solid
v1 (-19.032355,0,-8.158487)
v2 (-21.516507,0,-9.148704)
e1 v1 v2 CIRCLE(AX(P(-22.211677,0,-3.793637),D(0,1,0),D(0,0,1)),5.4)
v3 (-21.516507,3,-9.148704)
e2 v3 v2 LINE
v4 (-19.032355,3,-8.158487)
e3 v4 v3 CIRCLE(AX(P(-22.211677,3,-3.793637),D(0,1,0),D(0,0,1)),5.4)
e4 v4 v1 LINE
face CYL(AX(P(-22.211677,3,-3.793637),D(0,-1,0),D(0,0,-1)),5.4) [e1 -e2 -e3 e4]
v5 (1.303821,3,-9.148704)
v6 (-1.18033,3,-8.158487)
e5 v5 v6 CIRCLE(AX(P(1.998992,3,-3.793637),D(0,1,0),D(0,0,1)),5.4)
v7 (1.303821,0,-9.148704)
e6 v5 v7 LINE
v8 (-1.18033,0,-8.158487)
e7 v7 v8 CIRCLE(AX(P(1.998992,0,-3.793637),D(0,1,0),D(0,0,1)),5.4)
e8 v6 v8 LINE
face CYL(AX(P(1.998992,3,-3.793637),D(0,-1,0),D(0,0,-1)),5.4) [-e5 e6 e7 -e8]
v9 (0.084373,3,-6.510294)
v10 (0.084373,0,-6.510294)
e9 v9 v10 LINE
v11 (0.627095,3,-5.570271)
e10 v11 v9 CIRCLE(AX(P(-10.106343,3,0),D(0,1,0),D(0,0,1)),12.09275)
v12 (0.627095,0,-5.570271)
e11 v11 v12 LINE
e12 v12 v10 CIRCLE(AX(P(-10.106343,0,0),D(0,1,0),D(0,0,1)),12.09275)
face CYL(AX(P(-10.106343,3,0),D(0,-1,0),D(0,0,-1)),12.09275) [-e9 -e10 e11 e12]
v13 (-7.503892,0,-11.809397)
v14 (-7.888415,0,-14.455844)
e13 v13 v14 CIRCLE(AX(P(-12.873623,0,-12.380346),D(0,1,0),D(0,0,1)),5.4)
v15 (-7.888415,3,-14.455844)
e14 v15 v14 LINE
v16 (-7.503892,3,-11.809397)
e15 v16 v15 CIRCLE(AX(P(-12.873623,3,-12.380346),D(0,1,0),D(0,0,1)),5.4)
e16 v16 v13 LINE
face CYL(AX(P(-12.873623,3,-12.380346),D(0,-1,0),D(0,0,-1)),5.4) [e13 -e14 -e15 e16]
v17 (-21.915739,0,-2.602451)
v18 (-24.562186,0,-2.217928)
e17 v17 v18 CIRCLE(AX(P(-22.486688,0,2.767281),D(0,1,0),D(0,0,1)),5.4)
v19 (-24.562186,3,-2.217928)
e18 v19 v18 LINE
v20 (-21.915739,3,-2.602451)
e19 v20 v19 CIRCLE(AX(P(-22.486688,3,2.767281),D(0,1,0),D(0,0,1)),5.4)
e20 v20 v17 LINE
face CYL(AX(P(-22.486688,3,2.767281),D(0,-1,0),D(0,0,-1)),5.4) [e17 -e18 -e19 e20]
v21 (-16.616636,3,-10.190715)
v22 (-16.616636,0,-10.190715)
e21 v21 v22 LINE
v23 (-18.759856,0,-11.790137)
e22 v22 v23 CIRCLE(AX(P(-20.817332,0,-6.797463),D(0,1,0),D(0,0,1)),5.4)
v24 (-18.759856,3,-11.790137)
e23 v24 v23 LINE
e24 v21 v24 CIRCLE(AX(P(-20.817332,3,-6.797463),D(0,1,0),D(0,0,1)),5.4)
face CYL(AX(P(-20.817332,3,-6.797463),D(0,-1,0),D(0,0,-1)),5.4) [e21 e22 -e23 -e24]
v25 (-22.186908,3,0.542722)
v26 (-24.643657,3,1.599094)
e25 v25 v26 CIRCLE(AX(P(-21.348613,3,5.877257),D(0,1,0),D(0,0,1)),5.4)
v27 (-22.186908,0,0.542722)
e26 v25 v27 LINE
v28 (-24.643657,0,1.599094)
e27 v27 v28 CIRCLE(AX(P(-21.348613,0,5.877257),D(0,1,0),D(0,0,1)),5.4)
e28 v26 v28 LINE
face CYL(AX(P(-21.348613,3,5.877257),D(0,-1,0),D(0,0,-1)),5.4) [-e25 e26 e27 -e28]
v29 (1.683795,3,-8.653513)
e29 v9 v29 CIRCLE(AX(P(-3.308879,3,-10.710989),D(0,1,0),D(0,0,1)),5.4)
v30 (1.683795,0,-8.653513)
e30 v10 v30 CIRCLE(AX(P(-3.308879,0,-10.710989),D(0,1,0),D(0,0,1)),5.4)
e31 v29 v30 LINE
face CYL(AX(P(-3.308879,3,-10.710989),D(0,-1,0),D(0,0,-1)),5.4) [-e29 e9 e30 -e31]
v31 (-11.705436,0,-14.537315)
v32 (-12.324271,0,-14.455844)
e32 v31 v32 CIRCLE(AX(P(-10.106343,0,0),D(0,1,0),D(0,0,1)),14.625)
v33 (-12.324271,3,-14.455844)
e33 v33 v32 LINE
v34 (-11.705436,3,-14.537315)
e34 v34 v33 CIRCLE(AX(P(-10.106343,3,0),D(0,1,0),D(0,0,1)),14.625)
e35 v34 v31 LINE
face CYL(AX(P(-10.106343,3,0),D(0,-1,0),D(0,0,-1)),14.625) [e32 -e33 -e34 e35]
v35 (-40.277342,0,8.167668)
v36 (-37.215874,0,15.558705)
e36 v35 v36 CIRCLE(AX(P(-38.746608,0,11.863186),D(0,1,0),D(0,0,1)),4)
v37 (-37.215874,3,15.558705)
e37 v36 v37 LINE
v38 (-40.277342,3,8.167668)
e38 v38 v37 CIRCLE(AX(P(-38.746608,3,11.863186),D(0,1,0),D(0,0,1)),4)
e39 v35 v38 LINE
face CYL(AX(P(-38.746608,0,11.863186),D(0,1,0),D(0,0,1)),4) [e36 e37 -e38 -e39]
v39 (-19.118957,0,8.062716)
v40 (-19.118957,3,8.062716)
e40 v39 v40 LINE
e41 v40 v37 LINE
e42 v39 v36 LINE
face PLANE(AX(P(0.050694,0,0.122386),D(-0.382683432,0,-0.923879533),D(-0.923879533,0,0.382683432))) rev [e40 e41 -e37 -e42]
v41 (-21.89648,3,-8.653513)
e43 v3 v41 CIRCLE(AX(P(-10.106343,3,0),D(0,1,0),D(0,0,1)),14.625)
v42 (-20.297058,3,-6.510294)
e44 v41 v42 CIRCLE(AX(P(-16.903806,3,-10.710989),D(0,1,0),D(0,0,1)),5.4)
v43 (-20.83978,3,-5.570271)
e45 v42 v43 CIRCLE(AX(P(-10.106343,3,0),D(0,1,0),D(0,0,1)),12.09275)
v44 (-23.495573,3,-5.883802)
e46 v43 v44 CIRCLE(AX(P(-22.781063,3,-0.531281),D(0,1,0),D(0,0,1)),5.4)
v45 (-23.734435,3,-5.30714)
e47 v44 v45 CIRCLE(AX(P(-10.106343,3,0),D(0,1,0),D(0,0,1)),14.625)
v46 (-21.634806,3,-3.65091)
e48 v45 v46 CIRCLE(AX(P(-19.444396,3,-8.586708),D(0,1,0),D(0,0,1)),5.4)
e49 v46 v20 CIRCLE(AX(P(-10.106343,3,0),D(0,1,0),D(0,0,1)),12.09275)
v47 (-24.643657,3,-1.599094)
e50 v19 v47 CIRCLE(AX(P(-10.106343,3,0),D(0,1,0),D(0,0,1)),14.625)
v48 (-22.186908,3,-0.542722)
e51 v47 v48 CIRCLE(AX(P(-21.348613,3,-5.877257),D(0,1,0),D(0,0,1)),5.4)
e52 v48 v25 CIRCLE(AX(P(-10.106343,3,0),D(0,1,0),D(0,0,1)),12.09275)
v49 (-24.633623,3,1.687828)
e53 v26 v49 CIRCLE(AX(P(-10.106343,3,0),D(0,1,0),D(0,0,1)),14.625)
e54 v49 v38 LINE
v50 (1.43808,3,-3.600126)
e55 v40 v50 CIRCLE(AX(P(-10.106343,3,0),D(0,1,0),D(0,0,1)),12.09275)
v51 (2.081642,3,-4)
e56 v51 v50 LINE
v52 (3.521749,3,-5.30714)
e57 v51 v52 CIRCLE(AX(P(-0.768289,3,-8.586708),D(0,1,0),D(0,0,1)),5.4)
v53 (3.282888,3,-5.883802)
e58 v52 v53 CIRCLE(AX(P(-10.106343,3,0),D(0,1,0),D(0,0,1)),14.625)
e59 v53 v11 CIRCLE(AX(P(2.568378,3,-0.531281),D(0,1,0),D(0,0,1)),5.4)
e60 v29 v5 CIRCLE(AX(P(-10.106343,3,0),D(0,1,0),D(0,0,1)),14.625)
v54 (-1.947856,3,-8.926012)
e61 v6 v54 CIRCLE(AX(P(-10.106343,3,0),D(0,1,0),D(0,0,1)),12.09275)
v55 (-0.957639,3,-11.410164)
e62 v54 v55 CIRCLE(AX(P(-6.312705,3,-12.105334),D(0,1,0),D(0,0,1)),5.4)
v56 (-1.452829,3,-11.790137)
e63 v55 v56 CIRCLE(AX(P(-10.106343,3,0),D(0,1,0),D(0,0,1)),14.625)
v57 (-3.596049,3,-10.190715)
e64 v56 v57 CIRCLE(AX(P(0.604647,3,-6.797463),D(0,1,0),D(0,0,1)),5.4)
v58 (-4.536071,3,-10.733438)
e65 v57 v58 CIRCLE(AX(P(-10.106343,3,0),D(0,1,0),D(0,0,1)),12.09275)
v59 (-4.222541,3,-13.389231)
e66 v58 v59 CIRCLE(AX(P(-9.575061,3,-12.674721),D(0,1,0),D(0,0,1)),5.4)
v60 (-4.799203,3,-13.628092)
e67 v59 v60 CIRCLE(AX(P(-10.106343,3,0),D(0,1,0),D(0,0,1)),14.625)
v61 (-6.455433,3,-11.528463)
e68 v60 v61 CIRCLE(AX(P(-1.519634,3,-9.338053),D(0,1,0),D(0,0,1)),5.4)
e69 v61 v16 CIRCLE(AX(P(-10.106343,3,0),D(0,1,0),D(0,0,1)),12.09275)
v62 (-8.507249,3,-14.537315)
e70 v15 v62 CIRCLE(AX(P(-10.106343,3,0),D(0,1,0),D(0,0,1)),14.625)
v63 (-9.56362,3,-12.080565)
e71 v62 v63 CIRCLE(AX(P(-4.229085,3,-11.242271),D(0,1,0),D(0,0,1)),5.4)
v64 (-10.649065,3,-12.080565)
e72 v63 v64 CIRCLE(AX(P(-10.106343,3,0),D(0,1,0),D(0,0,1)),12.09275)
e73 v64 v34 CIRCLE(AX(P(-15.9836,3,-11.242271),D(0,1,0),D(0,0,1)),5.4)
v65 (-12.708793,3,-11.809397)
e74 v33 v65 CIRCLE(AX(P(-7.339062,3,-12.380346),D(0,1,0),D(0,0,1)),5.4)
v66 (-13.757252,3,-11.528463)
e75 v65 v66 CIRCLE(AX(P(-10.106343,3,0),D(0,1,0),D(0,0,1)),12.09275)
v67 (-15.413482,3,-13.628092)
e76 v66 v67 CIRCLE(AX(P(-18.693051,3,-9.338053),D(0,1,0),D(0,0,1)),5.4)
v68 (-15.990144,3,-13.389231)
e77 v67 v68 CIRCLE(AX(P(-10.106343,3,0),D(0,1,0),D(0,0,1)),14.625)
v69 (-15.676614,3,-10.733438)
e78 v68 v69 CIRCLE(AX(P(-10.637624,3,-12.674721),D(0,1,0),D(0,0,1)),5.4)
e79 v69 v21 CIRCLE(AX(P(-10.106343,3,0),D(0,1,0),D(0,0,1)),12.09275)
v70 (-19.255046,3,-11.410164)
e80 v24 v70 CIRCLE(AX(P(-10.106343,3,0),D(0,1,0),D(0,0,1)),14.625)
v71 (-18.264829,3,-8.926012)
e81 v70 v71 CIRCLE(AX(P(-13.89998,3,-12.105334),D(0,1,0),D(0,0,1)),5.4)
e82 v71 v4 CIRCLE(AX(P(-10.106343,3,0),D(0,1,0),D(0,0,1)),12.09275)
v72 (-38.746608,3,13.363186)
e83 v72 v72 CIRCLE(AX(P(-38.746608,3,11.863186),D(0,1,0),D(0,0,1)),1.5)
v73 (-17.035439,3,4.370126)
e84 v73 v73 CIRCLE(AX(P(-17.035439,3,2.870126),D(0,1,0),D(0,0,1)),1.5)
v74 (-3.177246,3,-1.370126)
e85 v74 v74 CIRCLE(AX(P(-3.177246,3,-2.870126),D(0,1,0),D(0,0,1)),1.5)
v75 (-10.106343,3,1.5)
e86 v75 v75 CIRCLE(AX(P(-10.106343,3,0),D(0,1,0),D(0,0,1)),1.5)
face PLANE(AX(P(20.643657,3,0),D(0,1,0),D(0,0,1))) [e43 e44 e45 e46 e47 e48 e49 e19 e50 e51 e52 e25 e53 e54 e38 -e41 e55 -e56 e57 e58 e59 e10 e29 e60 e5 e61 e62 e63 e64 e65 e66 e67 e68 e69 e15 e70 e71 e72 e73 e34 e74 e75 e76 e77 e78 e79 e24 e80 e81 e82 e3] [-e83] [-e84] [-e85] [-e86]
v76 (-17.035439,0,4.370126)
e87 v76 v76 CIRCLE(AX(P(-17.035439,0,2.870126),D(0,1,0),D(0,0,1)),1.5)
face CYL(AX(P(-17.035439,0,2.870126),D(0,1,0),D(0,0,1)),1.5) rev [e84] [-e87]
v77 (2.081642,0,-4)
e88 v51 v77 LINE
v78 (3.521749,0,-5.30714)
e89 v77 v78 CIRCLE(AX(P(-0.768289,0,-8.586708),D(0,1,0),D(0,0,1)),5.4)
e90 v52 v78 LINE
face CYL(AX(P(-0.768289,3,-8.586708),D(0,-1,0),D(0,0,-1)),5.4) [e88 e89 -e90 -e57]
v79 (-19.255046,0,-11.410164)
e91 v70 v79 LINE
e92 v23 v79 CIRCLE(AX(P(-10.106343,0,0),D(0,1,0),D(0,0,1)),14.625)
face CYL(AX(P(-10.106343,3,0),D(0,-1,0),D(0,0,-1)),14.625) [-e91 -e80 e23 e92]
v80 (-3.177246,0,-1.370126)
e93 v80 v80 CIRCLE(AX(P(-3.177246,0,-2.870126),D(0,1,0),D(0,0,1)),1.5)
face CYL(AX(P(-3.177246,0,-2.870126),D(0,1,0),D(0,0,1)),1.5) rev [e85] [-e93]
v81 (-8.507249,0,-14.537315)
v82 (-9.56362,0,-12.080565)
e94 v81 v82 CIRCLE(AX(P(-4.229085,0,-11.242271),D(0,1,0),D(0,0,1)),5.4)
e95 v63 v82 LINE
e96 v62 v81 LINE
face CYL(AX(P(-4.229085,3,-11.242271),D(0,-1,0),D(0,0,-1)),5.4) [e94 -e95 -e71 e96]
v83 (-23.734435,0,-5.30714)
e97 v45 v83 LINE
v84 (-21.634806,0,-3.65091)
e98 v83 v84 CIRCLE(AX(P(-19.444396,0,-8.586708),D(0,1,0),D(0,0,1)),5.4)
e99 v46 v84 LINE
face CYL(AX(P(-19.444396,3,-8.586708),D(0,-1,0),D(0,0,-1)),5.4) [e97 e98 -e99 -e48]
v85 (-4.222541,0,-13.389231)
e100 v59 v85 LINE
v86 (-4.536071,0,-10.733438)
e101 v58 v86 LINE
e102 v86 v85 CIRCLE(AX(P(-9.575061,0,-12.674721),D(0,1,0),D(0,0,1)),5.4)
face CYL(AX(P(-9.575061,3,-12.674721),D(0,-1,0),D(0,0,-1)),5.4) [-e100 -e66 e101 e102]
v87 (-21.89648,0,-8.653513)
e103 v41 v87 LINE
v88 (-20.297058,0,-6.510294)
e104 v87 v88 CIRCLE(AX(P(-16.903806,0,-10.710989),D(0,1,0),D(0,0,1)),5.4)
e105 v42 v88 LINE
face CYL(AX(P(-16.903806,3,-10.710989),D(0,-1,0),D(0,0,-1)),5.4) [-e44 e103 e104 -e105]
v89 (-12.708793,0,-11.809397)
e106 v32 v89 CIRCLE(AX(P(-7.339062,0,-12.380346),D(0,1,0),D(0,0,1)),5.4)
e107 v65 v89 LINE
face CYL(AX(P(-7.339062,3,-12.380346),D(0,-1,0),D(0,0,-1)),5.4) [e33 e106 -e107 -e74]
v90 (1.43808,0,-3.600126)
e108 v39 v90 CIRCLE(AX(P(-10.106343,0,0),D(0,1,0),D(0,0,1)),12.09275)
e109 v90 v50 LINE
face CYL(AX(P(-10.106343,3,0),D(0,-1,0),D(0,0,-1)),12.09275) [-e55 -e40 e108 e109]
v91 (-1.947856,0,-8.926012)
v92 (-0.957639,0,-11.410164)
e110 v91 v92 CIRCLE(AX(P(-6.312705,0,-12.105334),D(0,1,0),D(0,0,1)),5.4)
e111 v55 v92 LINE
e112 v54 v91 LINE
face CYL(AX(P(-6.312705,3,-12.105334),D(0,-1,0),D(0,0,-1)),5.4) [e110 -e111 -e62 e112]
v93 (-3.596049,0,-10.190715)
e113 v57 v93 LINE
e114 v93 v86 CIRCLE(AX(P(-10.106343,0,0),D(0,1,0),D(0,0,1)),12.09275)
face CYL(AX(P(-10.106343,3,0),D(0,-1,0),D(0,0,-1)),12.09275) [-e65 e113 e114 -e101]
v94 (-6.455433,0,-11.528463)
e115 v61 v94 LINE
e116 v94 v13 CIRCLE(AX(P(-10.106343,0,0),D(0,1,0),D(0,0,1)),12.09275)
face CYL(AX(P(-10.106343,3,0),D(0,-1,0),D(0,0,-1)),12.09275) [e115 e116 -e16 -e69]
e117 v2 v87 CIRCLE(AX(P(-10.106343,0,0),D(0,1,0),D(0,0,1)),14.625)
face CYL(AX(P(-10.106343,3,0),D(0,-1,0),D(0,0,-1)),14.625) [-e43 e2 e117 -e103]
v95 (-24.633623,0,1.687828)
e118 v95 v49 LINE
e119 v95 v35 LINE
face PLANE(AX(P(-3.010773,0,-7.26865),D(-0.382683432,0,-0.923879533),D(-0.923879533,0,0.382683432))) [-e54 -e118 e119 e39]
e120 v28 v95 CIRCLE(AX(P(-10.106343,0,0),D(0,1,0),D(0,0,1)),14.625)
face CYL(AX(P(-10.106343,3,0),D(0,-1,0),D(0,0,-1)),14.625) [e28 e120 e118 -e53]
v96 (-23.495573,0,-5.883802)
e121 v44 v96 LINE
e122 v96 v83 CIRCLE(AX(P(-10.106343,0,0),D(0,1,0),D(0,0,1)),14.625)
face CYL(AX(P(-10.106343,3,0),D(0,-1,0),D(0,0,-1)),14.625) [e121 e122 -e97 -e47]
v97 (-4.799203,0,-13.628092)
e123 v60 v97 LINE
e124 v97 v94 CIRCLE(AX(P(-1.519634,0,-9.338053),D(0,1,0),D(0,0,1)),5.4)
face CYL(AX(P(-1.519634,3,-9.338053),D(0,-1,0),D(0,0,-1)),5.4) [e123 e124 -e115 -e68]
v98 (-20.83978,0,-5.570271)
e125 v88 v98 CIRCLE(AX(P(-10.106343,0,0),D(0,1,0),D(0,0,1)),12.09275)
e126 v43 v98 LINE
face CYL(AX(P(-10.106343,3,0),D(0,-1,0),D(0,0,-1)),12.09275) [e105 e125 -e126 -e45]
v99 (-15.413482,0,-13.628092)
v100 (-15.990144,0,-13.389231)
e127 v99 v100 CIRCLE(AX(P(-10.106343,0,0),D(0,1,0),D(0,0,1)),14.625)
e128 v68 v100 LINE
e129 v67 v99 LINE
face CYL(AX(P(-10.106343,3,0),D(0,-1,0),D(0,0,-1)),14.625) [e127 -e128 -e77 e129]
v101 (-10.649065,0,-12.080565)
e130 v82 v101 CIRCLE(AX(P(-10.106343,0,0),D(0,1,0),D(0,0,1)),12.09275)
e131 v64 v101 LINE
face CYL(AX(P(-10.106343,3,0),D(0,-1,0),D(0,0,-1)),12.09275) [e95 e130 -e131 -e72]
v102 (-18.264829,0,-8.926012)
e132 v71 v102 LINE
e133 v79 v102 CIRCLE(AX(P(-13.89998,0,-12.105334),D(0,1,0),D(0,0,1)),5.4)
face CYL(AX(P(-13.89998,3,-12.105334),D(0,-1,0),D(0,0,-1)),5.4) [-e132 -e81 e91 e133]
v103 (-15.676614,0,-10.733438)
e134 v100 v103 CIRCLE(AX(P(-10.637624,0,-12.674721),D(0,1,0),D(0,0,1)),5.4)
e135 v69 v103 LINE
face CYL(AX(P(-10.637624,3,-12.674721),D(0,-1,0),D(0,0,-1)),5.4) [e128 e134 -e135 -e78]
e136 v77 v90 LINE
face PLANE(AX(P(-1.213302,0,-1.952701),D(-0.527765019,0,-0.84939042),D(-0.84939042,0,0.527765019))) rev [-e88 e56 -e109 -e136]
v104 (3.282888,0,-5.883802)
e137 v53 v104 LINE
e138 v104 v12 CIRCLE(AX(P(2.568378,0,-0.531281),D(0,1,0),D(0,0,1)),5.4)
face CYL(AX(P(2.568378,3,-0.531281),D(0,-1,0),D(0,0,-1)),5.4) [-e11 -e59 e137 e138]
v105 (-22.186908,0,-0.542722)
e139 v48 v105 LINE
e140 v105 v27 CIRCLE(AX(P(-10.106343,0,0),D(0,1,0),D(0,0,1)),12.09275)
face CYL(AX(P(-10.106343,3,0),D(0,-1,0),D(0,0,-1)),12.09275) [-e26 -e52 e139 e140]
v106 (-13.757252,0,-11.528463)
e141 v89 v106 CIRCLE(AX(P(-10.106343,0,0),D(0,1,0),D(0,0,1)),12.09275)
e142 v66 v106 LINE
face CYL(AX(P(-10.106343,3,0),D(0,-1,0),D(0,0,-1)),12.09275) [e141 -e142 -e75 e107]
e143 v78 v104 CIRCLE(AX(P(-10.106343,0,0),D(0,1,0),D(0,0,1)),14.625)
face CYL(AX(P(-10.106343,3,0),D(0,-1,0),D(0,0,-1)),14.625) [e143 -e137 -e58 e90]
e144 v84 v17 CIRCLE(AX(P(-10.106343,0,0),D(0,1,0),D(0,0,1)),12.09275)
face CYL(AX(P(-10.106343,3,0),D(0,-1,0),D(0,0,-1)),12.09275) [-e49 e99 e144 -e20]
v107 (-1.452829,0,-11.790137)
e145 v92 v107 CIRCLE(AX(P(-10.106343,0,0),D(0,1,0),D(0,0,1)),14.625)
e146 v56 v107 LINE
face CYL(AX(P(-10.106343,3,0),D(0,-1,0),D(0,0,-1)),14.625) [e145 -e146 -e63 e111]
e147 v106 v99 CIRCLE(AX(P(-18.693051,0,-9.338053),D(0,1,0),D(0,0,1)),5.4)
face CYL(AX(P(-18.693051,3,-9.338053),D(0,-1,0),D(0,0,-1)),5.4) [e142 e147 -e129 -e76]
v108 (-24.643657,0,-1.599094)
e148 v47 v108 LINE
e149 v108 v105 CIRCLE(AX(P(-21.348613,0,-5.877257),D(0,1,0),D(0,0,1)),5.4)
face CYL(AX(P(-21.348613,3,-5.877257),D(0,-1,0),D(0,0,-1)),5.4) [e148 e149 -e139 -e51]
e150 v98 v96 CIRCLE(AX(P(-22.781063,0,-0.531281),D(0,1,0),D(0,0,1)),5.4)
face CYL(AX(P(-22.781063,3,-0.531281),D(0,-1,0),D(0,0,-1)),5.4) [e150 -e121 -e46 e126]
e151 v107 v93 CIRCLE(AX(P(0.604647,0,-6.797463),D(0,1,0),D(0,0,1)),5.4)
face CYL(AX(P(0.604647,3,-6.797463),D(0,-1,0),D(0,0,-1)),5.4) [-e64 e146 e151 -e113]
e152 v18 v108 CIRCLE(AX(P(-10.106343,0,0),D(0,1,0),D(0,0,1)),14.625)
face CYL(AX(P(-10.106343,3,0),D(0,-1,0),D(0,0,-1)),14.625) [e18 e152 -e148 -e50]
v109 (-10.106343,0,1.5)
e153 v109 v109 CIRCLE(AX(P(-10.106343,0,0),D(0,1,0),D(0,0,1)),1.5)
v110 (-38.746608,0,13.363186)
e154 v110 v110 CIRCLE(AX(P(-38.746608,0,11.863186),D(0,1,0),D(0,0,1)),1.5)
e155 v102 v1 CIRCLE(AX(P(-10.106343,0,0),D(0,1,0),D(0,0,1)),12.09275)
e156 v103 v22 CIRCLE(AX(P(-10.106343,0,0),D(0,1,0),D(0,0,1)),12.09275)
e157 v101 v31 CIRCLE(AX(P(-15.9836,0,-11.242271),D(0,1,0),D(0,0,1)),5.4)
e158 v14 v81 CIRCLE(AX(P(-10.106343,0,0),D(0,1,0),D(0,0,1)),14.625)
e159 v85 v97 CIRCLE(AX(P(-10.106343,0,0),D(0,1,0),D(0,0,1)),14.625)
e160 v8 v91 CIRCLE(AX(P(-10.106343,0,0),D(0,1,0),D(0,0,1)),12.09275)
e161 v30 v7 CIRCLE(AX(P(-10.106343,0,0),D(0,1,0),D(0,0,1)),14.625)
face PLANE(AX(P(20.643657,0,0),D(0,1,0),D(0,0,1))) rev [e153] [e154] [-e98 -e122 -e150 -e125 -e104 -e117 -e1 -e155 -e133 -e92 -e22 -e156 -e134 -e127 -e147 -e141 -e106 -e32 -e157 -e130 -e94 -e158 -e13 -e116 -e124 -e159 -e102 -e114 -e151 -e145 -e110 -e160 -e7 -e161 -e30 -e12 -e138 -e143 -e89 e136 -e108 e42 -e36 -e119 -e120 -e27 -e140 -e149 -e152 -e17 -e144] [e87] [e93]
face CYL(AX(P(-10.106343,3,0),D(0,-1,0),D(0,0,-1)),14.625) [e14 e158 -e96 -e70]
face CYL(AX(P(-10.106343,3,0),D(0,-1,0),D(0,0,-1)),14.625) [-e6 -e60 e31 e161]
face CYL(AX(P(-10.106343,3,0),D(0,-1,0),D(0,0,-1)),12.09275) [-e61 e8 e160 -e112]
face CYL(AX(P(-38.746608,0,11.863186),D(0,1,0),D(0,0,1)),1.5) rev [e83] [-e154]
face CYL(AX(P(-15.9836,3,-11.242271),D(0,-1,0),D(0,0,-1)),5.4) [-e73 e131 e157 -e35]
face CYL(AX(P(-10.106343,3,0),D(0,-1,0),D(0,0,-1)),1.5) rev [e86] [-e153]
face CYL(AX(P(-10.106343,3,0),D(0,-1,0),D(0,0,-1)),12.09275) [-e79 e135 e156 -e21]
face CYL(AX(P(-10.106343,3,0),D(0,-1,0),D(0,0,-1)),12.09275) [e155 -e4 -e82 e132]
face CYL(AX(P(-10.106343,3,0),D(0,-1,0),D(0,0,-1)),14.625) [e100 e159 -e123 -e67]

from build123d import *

# Parameters (mm, degrees)
SKETCH1_R              = 1.5
BOSS_EXTRUDE1_DEPTH    = 3
SKETCH3_R              = 1.5
BOSS_EXTRUDE2_DEPTH    = 3
CUT_EXTRUDE1_OUTLINE_R = 1.5
CUT_EXTRUDE1_DEPTH     = 3


# Read off the part's stored shape, not the designer's step: Cut-Extrude1
with BuildPart() as part:
    # Sketch1 → Boss-Extrude1 (new body)
    with BuildSketch(Plane(origin=(0, 0, 0), x_dir=(1, 0, 0), z_dir=(0, 1, 0))):
        with BuildLine():
            Line((20.643657446, 4), (2.081641936, 4))
            ThreePointArc((2.081641936, 4), (2.861028333, 4.588201733), (3.521749436, 5.30713988))
            ThreePointArc((3.521749436, 5.30713988), (3.405395609, 5.596745198), (3.282888305, 5.883801663))
            ThreePointArc((3.282888305, 5.883801663), (1.93527598, 5.894040025), (0.627094961, 5.57027124))
            ThreePointArc((0.627094961, 5.57027124), (0.366286148, 6.046375), (0.084372603, 6.510293938))
            ThreePointArc((0.084372603, 6.510293938), (1.018855105, 7.48132754), (1.683794586, 8.65351323))
            ThreePointArc((1.683794586, 8.65351323), (1.496450048, 8.903135899), (1.303821399, 9.148703928))
            ThreePointArc((1.303821399, 9.148703928), (-0.000522033, 8.809805691), (-1.180330337, 8.158486898))
            ThreePointArc((-1.180330337, 8.158486898), (-1.555477026, 8.550865528), (-1.947855656, 8.926012217))
            ThreePointArc((-1.947855656, 8.926012217), (-1.296536862, 10.105820521), (-0.957638625, 11.410163953))
            ThreePointArc((-0.957638625, 11.410163953), (-1.203206655, 11.602792602), (-1.452829324, 11.79013714))
            ThreePointArc((-1.452829324, 11.79013714), (-2.625015014, 11.125197659), (-3.596048616, 10.190715157))
            ThreePointArc((-3.596048616, 10.190715157), (-4.059967554, 10.472628702), (-4.536071314, 10.733437515))
            ThreePointArc((-4.536071314, 10.733437515), (-4.212302529, 12.041618533), (-4.222540891, 13.389230859))
            ThreePointArc((-4.222540891, 13.389230859), (-4.509597355, 13.511738163), (-4.799202674, 13.62809199))
            ThreePointArc((-4.799202674, 13.62809199), (-5.759348103, 12.682425791), (-6.455432668, 11.528463019))
            ThreePointArc((-6.455432668, 11.528463019), (-6.976508546, 11.680699536), (-7.503891752, 11.809396783))
            ThreePointArc((-7.503891752, 11.809396783), (-7.529737283, 13.156800143), (-7.888414517, 14.455843809))
            ThreePointArc((-7.888414517, 14.455843809), (-8.197396993, 14.499881098), (-8.507248835, 14.537314892))
            ThreePointArc((-8.507248835, 14.537314892), (-9.18992168, 13.375367565), (-9.563620196, 12.080565177))
            ThreePointArc((-9.563620196, 12.080565177), (-10.106342554, 12.09275), (-10.649064912, 12.080565177))
            ThreePointArc((-10.649064912, 12.080565177), (-11.022763428, 13.375367565), (-11.705436272, 14.537314892))
            ThreePointArc((-11.705436272, 14.537314892), (-12.015288115, 14.499881098), (-12.324270591, 14.455843809))
            ThreePointArc((-12.324270591, 14.455843809), (-12.682947825, 13.156800143), (-12.708793355, 11.809396783))
            ThreePointArc((-12.708793355, 11.809396783), (-13.236176561, 11.680699536), (-13.757252439, 11.528463019))
            ThreePointArc((-13.757252439, 11.528463019), (-14.453337005, 12.682425791), (-15.413482434, 13.62809199))
            ThreePointArc((-15.413482434, 13.62809199), (-15.703087752, 13.511738163), (-15.990144217, 13.389230859))
            ThreePointArc((-15.990144217, 13.389230859), (-16.000382579, 12.041618533), (-15.676613793, 10.733437515))
            ThreePointArc((-15.676613793, 10.733437515), (-16.152717554, 10.472628702), (-16.616636492, 10.190715157))
            ThreePointArc((-16.616636492, 10.190715157), (-17.587670094, 11.125197659), (-18.759855783, 11.79013714))
            ThreePointArc((-18.759855783, 11.79013714), (-19.009478453, 11.602792602), (-19.255046482, 11.410163953))
            ThreePointArc((-19.255046482, 11.410163953), (-18.916148245, 10.105820521), (-18.264829452, 8.926012217))
            ThreePointArc((-18.264829452, 8.926012217), (-18.657208082, 8.550865528), (-19.032354771, 8.158486898))
            ThreePointArc((-19.032354771, 8.158486898), (-20.212163074, 8.809805691), (-21.516506507, 9.148703928))
            ThreePointArc((-21.516506507, 9.148703928), (-21.709135156, 8.903135899), (-21.896479694, 8.65351323))
            ThreePointArc((-21.896479694, 8.65351323), (-21.231540213, 7.48132754), (-20.297057711, 6.510293938))
            ThreePointArc((-20.297057711, 6.510293938), (-20.578971255, 6.046375), (-20.839780068, 5.57027124))
            ThreePointArc((-20.839780068, 5.57027124), (-22.147961087, 5.894040025), (-23.495573413, 5.883801663))
            ThreePointArc((-23.495573413, 5.883801663), (-23.618080717, 5.596745198), (-23.734434544, 5.30713988))
            ThreePointArc((-23.734434544, 5.30713988), (-22.788768345, 4.346994451), (-21.634805572, 3.650909885))
            ThreePointArc((-21.634805572, 3.650909885), (-21.78704209, 3.129834008), (-21.915739337, 2.602450802))
            ThreePointArc((-21.915739337, 2.602450802), (-23.263142697, 2.576605271), (-24.562186363, 2.217928037))
            ThreePointArc((-24.562186363, 2.217928037), (-24.606223651, 1.908945561), (-24.643657446, 1.599093719))
            ThreePointArc((-24.643657446, 1.599093719), (-23.481710119, 0.916420874), (-22.186907731, 0.542722358))
            ThreePointArc((-22.186907731, 0.542722358), (-22.199092554, 0), (-22.186907731, -0.542722358))
            ThreePointArc((-22.186907731, -0.542722358), (-23.481710119, -0.916420874), (-24.643657446, -1.599093719))
            ThreePointArc((-24.643657446, -1.599093719), (-24.606223651, -1.908945561), (-24.562186363, -2.217928037))
            ThreePointArc((-24.562186363, -2.217928037), (-23.263142697, -2.576605271), (-21.915739337, -2.602450802))
            ThreePointArc((-21.915739337, -2.602450802), (-21.78704209, -3.129834008), (-21.634805572, -3.650909885))
            ThreePointArc((-21.634805572, -3.650909885), (-22.788768345, -4.346994451), (-23.734434544, -5.30713988))
            ThreePointArc((-23.734434544, -5.30713988), (-23.618080717, -5.596745198), (-23.495573413, -5.883801663))
            ThreePointArc((-23.495573413, -5.883801663), (-22.147961087, -5.894040025), (-20.839780068, -5.57027124))
            ThreePointArc((-20.839780068, -5.57027124), (-20.578971255, -6.046375), (-20.297057711, -6.510293938))
            ThreePointArc((-20.297057711, -6.510293938), (-21.231540213, -7.48132754), (-21.896479694, -8.65351323))
            ThreePointArc((-21.896479694, -8.65351323), (-21.709135156, -8.903135899), (-21.516506507, -9.148703928))
            ThreePointArc((-21.516506507, -9.148703928), (-20.212163074, -8.809805691), (-19.032354771, -8.158486898))
            ThreePointArc((-19.032354771, -8.158486898), (-18.657208082, -8.550865528), (-18.264829452, -8.926012217))
            ThreePointArc((-18.264829452, -8.926012217), (-18.916148245, -10.105820521), (-19.255046482, -11.410163953))
            ThreePointArc((-19.255046482, -11.410163953), (-19.009478453, -11.602792602), (-18.759855783, -11.79013714))
            ThreePointArc((-18.759855783, -11.79013714), (-17.587670094, -11.125197659), (-16.616636492, -10.190715157))
            ThreePointArc((-16.616636492, -10.190715157), (-16.152717554, -10.472628702), (-15.676613793, -10.733437515))
            ThreePointArc((-15.676613793, -10.733437515), (-16.000382579, -12.041618533), (-15.990144217, -13.389230859))
            ThreePointArc((-15.990144217, -13.389230859), (-15.703087752, -13.511738163), (-15.413482434, -13.62809199))
            ThreePointArc((-15.413482434, -13.62809199), (-14.453337005, -12.682425791), (-13.757252439, -11.528463019))
            ThreePointArc((-13.757252439, -11.528463019), (-13.236176561, -11.680699536), (-12.708793355, -11.809396783))
            ThreePointArc((-12.708793355, -11.809396783), (-12.682947825, -13.156800143), (-12.324270591, -14.455843809))
            ThreePointArc((-12.324270591, -14.455843809), (-12.015288115, -14.499881098), (-11.705436272, -14.537314892))
            ThreePointArc((-11.705436272, -14.537314892), (-11.022763428, -13.375367565), (-10.649064912, -12.080565177))
            ThreePointArc((-10.649064912, -12.080565177), (-10.106342554, -12.09275), (-9.563620196, -12.080565177))
            ThreePointArc((-9.563620196, -12.080565177), (-9.18992168, -13.375367565), (-8.507248835, -14.537314892))
            ThreePointArc((-8.507248835, -14.537314892), (-8.197396993, -14.499881098), (-7.888414517, -14.455843809))
            ThreePointArc((-7.888414517, -14.455843809), (-7.529737283, -13.156800143), (-7.503891752, -11.809396783))
            ThreePointArc((-7.503891752, -11.809396783), (-6.976508546, -11.680699536), (-6.455432668, -11.528463019))
            ThreePointArc((-6.455432668, -11.528463019), (-5.759348103, -12.682425791), (-4.799202674, -13.62809199))
            ThreePointArc((-4.799202674, -13.62809199), (-4.509597355, -13.511738163), (-4.222540891, -13.389230859))
            ThreePointArc((-4.222540891, -13.389230859), (-4.212302529, -12.041618533), (-4.536071314, -10.733437515))
            ThreePointArc((-4.536071314, -10.733437515), (-4.059967554, -10.472628702), (-3.596048616, -10.190715157))
            ThreePointArc((-3.596048616, -10.190715157), (-2.625015014, -11.125197659), (-1.452829324, -11.79013714))
            ThreePointArc((-1.452829324, -11.79013714), (-1.203206655, -11.602792602), (-0.957638625, -11.410163953))
            ThreePointArc((-0.957638625, -11.410163953), (-1.296536862, -10.105820521), (-1.947855656, -8.926012217))
            ThreePointArc((-1.947855656, -8.926012217), (-1.555477026, -8.550865528), (-1.180330337, -8.158486898))
            ThreePointArc((-1.180330337, -8.158486898), (-0.000522033, -8.809805691), (1.303821399, -9.148703928))
            ThreePointArc((1.303821399, -9.148703928), (1.496450048, -8.903135899), (1.683794586, -8.65351323))
            ThreePointArc((1.683794586, -8.65351323), (1.018855105, -7.48132754), (0.084372603, -6.510293938))
            ThreePointArc((0.084372603, -6.510293938), (0.366286148, -6.046375), (0.627094961, -5.57027124))
            ThreePointArc((0.627094961, -5.57027124), (1.93527598, -5.894040025), (3.282888305, -5.883801663))
            ThreePointArc((3.282888305, -5.883801663), (3.405395609, -5.596745198), (3.521749436, -5.30713988))
            ThreePointArc((3.521749436, -5.30713988), (2.861028333, -4.588201733), (2.081641936, -4))
            Line((2.081641936, -4), (20.643657446, -4))
            ThreePointArc((20.643657446, -4), (24.643657446, 0), (20.643657446, 4))
        make_face()
        with Locations(Location((-10.106342554, 0, 0), (0, 0, 270))):
            Circle(SKETCH1_R, mode=Mode.SUBTRACT)
        with Locations(Location((20.643657446, 0, 0), (0, 0, 270))):
            Circle(SKETCH1_R, mode=Mode.SUBTRACT)
    extrude(amount=BOSS_EXTRUDE1_DEPTH)

    # Sketch3 → Boss-Extrude2 (add)
    with BuildSketch(Plane(origin=(0, 3, 0), x_dir=(1, 0, 0), z_dir=(0, 1, 0))):
        with BuildLine():
            Line((-14.106342554, 0), (-20.558846273, 0))
            Line((-20.558846273, 0), (-40.277341791, -8.167668273))
            ThreePointArc((-40.277341791, -8.167668273), (-42.442126192, -13.393920133), (-37.215874332, -15.558704533))
            Line((-37.215874332, -15.558704533), (-8.575608824, -3.69551813))
            ThreePointArc((-8.575608824, -3.69551813), (-12.328623486, -3.325878449), (-14.106342554, 0))
        make_face()
        with Locations(Location((-38.746608062, -11.863186403, 0), (0, 0, 270))):
            Circle(SKETCH3_R, mode=Mode.SUBTRACT)
    extrude(amount=-BOSS_EXTRUDE2_DEPTH)

    # Cut-Extrude1 outline → Cut-Extrude1 (cut)
    # profile 1 of 11: a face of its own
    with BuildSketch(Plane(origin=(0, 0, 0), x_dir=(1, 0, 0), z_dir=(0, 1, 0))):
        with BuildLine():
            Line((2.081641936, 4), (1.43808022, 3.600125745))
            ThreePointArc((1.43808022, 3.600125745), (1.939395695, -1.065266441), (0.627094961, -5.57027124))
            ThreePointArc((0.627094961, -5.57027124), (1.93527598, -5.894040025), (3.282888305, -5.883801663))
            ThreePointArc((3.282888305, -5.883801663), (3.405395609, -5.596745198), (3.521749436, -5.30713988))
            ThreePointArc((3.521749436, -5.30713988), (2.861028333, -4.588201733), (2.081641936, -4))
            Line((2.081641936, -4), (20.643657446, -4))
            ThreePointArc((20.643657446, -4), (24.643657446, 0), (20.643657446, 4))
            Line((20.643657446, 4), (2.081641936, 4))
        make_face()
        with Locations((20.643657446, 0)):
            Circle(CUT_EXTRUDE1_OUTLINE_R, mode=Mode.SUBTRACT)
    # profile 2 of 11: a face of its own
    with BuildSketch(Plane(origin=(0, 0, 0), x_dir=(1, 0, 0), z_dir=(0, 1, 0))):
        with BuildLine():
            ThreePointArc((-21.516506507, -9.148703928), (-20.212163075, -8.809805691), (-19.032354771, -8.158486898))
            ThreePointArc((-19.032354771, -8.158486898), (-19.075783612, -8.110716964), (-19.118956803, -8.062715855))
            Line((-19.118956803, -8.062715855), (-21.572155055, -9.078863843))
            ThreePointArc((-21.572155055, -9.078863843), (-21.544384086, -9.113826359), (-21.516506507, -9.148703928))
        make_face()
    # profile 3 of 11: a face of its own
    with BuildSketch(Plane(origin=(0, 0, 0), x_dir=(1, 0, 0), z_dir=(0, 1, 0))):
        with BuildLine():
            ThreePointArc((-18.759855783, -11.79013714), (-17.587670094, -11.125197659), (-16.616636492, -10.190715157))
            ThreePointArc((-16.616636492, -10.190715157), (-17.467942325, -9.593823606), (-18.264829452, -8.926012217))
            ThreePointArc((-18.264829452, -8.926012217), (-18.916148245, -10.105820521), (-19.255046482, -11.410163953))
            ThreePointArc((-19.255046482, -11.410163953), (-19.009478453, -11.602792602), (-18.759855783, -11.79013714))
        make_face()
    # profile 4 of 11: a face of its own
    with BuildSketch(Plane(origin=(0, 0, 0), x_dir=(1, 0, 0), z_dir=(0, 1, 0))):
        with BuildLine():
            ThreePointArc((-15.413482434, -13.62809199), (-14.453337005, -12.682425791), (-13.757252439, -11.528463019))
            ThreePointArc((-13.757252439, -11.528463019), (-14.73403763, -11.172244217), (-15.676613793, -10.733437515))
            ThreePointArc((-15.676613793, -10.733437515), (-16.000382579, -12.041618533), (-15.990144217, -13.389230859))
            ThreePointArc((-15.990144217, -13.389230859), (-15.703087752, -13.511738163), (-15.413482434, -13.62809199))
        make_face()
    # profile 5 of 11: a face of its own
    with BuildSketch(Plane(origin=(0, 0, 0), x_dir=(1, 0, 0), z_dir=(0, 1, 0))):
        with BuildLine():
            ThreePointArc((-11.705436272, -14.537314892), (-11.022763428, -13.375367565), (-10.649064912, -12.080565177))
            ThreePointArc((-10.649064912, -12.080565177), (-11.684763165, -11.989294847), (-12.708793355, -11.809396783))
            ThreePointArc((-12.708793355, -11.809396783), (-12.682947825, -13.156800143), (-12.324270591, -14.455843809))
            ThreePointArc((-12.324270591, -14.455843809), (-12.015288115, -14.499881098), (-11.705436272, -14.537314892))
        make_face()
    # profile 6 of 11: a face of its own
    with BuildSketch(Plane(origin=(0, 0, 0), x_dir=(1, 0, 0), z_dir=(0, 1, 0))):
        with BuildLine():
            ThreePointArc((-7.888414517, -14.455843809), (-7.529737283, -13.156800143), (-7.503891752, -11.809396783))
            ThreePointArc((-7.503891752, -11.809396783), (-8.527921943, -11.989294847), (-9.563620196, -12.080565177))
            ThreePointArc((-9.563620196, -12.080565177), (-9.18992168, -13.375367565), (-8.507248835, -14.537314892))
            ThreePointArc((-8.507248835, -14.537314892), (-8.197396993, -14.499881098), (-7.888414517, -14.455843809))
        make_face()
    # profile 7 of 11: a face of its own
    with BuildSketch(Plane(origin=(0, 0, 0), x_dir=(1, 0, 0), z_dir=(0, 1, 0))):
        with BuildLine():
            ThreePointArc((-4.222540891, -13.389230859), (-4.212302529, -12.041618534), (-4.536071314, -10.733437515))
            ThreePointArc((-4.536071314, -10.733437515), (-5.478647477, -11.172244217), (-6.455432668, -11.528463019))
            ThreePointArc((-6.455432668, -11.528463019), (-5.759348103, -12.682425792), (-4.799202674, -13.62809199))
            ThreePointArc((-4.799202674, -13.62809199), (-4.509597356, -13.511738163), (-4.222540891, -13.389230859))
        make_face()
    # profile 8 of 11: a face of its own
    with BuildSketch(Plane(origin=(0, 0, 0), x_dir=(1, 0, 0), z_dir=(0, 1, 0))):
        with BuildLine():
            ThreePointArc((-0.957638625, -11.410163953), (-1.296536862, -10.105820521), (-1.947855656, -8.926012217))
            ThreePointArc((-1.947855656, -8.926012217), (-2.744742783, -9.593823606), (-3.596048616, -10.190715157))
            ThreePointArc((-3.596048616, -10.190715157), (-2.625015014, -11.125197659), (-1.452829324, -11.79013714))
            ThreePointArc((-1.452829324, -11.79013714), (-1.203206654, -11.602792602), (-0.957638625, -11.410163953))
        make_face()
    # profile 9 of 11: a face of its own
    with BuildSketch(Plane(origin=(0, 0, 0), x_dir=(1, 0, 0), z_dir=(0, 1, 0))):
        with BuildLine():
            ThreePointArc((1.683794586, -8.65351323), (1.018855105, -7.48132754), (0.084372603, -6.510293938))
            ThreePointArc((0.084372603, -6.510293938), (-0.512518948, -7.361599771), (-1.180330337, -8.158486898))
            ThreePointArc((-1.180330337, -8.158486898), (-0.000522033, -8.809805691), (1.303821399, -9.148703928))
            ThreePointArc((1.303821399, -9.148703928), (1.496450048, -8.903135899), (1.683794586, -8.65351323))
        make_face()
    # profile 10 of 11: a face of its own
    with BuildSketch(Plane(origin=(0, 0, 0), x_dir=(1, 0, 0), z_dir=(0, 1, 0))):
        with Locations((-17.035439048, -2.870125743)):
            Circle(CUT_EXTRUDE1_OUTLINE_R)
    # profile 11 of 11: a face of its own
    with BuildSketch(Plane(origin=(0, 0, 0), x_dir=(1, 0, 0), z_dir=(0, 1, 0))):
        with Locations((-3.17724606, 2.870125743)):
            Circle(CUT_EXTRUDE1_OUTLINE_R)
    extrude(amount=CUT_EXTRUDE1_DEPTH, mode=Mode.SUBTRACT)


solid = part.part
